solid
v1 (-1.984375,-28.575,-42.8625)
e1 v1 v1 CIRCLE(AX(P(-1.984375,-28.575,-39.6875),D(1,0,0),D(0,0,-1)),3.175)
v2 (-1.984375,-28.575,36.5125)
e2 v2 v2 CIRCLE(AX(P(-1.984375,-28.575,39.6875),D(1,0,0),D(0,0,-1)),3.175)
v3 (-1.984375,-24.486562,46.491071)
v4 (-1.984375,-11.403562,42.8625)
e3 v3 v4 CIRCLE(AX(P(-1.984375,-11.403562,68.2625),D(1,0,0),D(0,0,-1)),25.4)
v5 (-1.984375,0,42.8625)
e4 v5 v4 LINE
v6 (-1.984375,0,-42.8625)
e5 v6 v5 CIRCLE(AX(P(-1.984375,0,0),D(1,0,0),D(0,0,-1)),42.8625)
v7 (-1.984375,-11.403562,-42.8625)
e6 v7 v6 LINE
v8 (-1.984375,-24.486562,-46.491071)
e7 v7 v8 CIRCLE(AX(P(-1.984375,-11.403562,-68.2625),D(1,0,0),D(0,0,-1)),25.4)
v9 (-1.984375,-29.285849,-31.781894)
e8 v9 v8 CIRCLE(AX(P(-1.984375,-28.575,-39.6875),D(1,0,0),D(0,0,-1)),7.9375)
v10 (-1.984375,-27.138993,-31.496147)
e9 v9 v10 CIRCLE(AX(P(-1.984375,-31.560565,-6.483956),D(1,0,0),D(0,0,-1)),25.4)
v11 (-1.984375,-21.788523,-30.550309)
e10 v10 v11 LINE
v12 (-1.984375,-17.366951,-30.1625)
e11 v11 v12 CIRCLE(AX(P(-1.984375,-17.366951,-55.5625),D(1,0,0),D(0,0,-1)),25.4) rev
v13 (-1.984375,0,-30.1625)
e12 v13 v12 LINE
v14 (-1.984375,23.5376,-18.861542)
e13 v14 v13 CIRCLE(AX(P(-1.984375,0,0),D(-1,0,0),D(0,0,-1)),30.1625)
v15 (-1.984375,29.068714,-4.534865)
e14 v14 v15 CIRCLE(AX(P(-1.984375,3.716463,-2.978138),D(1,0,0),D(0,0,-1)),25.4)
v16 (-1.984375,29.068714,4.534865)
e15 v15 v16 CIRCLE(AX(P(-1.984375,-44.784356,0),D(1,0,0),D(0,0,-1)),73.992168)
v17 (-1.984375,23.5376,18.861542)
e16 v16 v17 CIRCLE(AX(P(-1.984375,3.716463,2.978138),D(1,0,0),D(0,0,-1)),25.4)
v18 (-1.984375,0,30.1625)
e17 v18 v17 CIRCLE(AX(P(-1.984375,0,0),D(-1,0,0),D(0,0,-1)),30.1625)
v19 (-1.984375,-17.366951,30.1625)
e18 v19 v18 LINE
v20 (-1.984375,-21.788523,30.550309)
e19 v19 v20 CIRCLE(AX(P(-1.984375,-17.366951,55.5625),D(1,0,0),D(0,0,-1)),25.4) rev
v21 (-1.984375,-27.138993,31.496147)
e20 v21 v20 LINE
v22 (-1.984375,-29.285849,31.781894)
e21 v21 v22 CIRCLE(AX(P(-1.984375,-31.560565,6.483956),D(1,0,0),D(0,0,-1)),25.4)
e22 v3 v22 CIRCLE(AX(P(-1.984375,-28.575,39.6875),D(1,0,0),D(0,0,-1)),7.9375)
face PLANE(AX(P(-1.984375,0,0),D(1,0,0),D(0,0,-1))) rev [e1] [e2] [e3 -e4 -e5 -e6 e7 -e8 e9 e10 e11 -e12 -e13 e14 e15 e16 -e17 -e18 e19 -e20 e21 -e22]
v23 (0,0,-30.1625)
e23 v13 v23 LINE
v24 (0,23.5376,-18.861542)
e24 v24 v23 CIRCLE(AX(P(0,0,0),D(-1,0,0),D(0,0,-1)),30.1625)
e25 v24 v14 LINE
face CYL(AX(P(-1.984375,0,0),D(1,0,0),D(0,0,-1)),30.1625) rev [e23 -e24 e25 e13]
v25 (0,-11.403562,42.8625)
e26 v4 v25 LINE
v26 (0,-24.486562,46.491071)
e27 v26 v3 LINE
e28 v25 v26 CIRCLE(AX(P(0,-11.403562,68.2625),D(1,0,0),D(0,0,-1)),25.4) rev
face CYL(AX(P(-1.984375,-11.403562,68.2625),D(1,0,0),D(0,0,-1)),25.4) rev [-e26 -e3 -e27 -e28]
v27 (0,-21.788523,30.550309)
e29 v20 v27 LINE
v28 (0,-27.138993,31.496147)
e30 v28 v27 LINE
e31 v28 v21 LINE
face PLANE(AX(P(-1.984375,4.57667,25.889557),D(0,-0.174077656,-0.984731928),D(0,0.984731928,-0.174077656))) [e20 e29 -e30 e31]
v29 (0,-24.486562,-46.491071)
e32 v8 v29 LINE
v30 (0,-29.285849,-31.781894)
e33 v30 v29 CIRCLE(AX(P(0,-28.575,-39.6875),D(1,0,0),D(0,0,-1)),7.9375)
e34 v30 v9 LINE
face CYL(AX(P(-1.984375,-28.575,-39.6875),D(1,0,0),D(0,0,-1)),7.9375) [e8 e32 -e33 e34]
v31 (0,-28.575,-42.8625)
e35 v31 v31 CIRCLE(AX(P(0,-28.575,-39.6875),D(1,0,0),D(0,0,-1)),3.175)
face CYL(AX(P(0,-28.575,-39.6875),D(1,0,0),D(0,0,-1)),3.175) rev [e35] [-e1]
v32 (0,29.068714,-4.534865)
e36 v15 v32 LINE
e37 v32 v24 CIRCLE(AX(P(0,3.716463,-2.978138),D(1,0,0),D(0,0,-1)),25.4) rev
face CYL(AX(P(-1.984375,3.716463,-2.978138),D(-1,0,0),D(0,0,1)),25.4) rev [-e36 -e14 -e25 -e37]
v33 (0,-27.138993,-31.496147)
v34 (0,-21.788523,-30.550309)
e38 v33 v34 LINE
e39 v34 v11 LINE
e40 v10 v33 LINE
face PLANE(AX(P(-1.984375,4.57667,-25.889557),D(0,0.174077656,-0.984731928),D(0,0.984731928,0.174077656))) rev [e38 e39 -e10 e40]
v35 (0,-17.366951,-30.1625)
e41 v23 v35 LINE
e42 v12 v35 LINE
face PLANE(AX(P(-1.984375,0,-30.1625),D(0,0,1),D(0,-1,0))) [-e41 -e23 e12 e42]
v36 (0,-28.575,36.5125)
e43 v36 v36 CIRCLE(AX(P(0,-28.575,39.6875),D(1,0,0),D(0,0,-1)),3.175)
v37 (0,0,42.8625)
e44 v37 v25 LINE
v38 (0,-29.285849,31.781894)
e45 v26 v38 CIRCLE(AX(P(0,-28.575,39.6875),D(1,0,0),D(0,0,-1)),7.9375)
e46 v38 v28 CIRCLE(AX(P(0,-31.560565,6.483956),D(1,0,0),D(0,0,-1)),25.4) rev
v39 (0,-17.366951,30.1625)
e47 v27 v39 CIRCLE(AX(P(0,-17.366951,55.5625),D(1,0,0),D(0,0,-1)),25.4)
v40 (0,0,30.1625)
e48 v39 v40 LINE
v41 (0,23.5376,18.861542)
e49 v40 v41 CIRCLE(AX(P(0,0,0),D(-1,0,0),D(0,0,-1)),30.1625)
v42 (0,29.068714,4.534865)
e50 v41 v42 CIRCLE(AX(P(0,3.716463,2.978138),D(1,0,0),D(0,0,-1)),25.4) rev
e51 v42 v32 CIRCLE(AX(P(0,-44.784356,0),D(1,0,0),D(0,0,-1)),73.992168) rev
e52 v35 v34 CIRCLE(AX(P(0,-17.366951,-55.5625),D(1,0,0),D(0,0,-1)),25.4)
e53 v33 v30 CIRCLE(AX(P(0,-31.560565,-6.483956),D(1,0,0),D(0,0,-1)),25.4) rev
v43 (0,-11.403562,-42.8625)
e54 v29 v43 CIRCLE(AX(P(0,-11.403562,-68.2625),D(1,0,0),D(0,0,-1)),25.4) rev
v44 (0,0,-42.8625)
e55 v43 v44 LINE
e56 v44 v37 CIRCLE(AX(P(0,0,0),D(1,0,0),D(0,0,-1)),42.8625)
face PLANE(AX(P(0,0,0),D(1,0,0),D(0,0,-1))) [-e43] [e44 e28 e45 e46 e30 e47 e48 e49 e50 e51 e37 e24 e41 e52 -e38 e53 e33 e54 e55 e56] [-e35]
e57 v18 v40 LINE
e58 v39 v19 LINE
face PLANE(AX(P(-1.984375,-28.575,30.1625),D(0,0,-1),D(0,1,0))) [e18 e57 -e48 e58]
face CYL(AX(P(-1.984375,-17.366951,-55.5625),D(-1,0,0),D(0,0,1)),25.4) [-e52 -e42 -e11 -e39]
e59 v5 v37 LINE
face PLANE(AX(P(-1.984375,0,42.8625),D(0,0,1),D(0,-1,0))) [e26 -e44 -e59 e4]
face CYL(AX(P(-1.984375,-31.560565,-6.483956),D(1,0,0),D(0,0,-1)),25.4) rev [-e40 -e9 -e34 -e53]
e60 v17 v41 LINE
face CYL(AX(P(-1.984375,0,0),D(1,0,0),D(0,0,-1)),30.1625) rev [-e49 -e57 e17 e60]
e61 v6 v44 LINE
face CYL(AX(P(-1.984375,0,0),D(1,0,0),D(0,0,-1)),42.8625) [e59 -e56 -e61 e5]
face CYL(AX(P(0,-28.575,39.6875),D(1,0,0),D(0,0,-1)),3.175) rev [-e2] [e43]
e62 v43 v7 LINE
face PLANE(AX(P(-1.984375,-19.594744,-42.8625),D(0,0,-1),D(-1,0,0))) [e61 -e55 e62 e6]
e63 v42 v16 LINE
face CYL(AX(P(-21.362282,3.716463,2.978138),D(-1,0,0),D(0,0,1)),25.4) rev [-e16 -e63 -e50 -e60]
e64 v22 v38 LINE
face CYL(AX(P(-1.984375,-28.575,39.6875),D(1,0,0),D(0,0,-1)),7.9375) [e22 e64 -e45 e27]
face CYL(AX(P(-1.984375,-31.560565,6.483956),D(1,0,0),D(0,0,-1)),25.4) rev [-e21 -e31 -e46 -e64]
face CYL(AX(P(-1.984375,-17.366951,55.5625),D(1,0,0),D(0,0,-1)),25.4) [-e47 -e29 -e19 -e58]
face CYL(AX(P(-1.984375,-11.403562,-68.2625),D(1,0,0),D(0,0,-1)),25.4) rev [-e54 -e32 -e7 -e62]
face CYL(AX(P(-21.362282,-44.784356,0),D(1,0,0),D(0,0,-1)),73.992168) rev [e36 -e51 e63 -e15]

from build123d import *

# Parameters (mm, degrees)
BASE_FLANGE1_DEPTH          = 1.984375
F_1_4_0_25_DIAMETER_HOLE1_D = 6.35
BOSS_EXTRUDE1_DEPTH         = 1.984375
FILLET1_R                   = 25.4
CUT_EXTRUDE1_DEPTH          = 66.291667351
FILLET2_R                   = 25.4


# Sheet-metal steps are written as plain solids
with BuildPart() as part:
    # Sketch2 → Base-Flange1 (new body)
    with BuildSketch(Plane(origin=(0, 0, 0), x_dir=(0, 0, -1), z_dir=(1, 0, 0))):
        with BuildLine():
            Line((30.1625, 0), (30.1625, -28.575))
            ThreePointArc((30.1625, -28.575), (45.186761314, -36.352129933), (42.8625, -19.594743879))
            Line((42.8625, -19.594743879), (42.8625, 0))
            ThreePointArc((42.8625, 0), (0, 42.8625), (-42.8625, 0))
            Line((-42.8625, 0), (-42.8625, -19.594743879))
            ThreePointArc((-42.8625, -19.594743879), (-45.186761314, -36.352129933), (-30.1625, -28.575))
            Line((-30.1625, -28.575), (-30.1625, 0))
            ThreePointArc((-30.1625, 0), (0, 30.1625), (30.1625, 0))
        make_face()
    extrude(amount=-BASE_FLANGE1_DEPTH)

    # 1/4 (0.25) Diameter Hole1 (through all)
    with Locations(Plane(origin=(0, 0, 0), x_dir=(0, 0, -1), z_dir=(1, 0, 0))):
        with Locations((-39.6875, -28.575), (39.6875, -28.575)):
            Hole(F_1_4_0_25_DIAMETER_HOLE1_D / 2)

    # Sketch10 → Boss-Extrude1 (add)
    with BuildSketch(Plane(origin=(0, 0, 0), x_dir=(0, 0, -1), z_dir=(1, 0, 0))):
        with BuildLine():
            ThreePointArc((9.656385517, 28.575), (0, 30.1625), (-9.656385517, 28.575))
            ThreePointArc((-9.656385517, 28.575), (0, 29.207811784), (9.656385517, 28.575))
        make_face()
    extrude(amount=-BOSS_EXTRUDE1_DEPTH)

    # Fillet1
    fillet1_edges = [part.edges().sort_by_distance(p)[0] for p in [
        (-0.9921875, 28.575, 9.656385517),
        (-0.9921875, 28.575, -9.656385517),
    ]]
    fillet(fillet1_edges, radius=FILLET1_R)

    # Sketch11 → Cut-Extrude1 (cut, through all)
    with BuildSketch(Plane(origin=(0, 0, 0), x_dir=(0, 0, -1), z_dir=(1, 0, 0))):
        with BuildLine():
            Line((-42.8625, -21.300161084), (-42.8625, -19.594743879))
            ThreePointArc((-42.8625, -19.594743879), (-45.186761314, -36.352129933), (-30.1625, -28.575))
            Line((-30.1625, -28.575), (-30.1625, -19.594743879))
            Line((-30.1625, -19.594743879), (-31.75, -28.575))
            ThreePointArc((-31.75, -28.575), (-44.0350478, -35.215988961), (-42.8625, -21.300161084))
        make_face()
        with BuildLine():
            ThreePointArc((30.1625, -28.575), (45.186761314, -36.352129933), (42.8625, -19.594743879))
            Line((42.8625, -19.594743879), (42.8625, -21.300161084))
            ThreePointArc((42.8625, -21.300161084), (46.328488961, -24.2274522), (47.625, -28.575))
            ThreePointArc((47.625, -28.575), (39.6875, -36.5125), (31.75, -28.575))
            Line((31.75, -28.575), (30.1625, -19.594743879))
            Line((30.1625, -19.594743879), (30.1625, -28.575))
        make_face()
    extrude(amount=-CUT_EXTRUDE1_DEPTH, mode=Mode.SUBTRACT)

    # Fillet2
    fillet2_edges = [part.edges().sort_by_distance(p)[0] for p in [
        (-0.9921875, -21.300161084, 42.8625),
        (-0.9921875, -28.575, 31.75),
        (-0.9921875, -19.594743879, 30.1625),
        (-0.9921875, -28.575, -31.75),
        (-0.9921875, -21.300161084, -42.8625),
        (-0.9921875, -19.594743879, -30.1625),
    ]]
    fillet(fillet2_edges, radius=FILLET2_R)


solid = part.part
